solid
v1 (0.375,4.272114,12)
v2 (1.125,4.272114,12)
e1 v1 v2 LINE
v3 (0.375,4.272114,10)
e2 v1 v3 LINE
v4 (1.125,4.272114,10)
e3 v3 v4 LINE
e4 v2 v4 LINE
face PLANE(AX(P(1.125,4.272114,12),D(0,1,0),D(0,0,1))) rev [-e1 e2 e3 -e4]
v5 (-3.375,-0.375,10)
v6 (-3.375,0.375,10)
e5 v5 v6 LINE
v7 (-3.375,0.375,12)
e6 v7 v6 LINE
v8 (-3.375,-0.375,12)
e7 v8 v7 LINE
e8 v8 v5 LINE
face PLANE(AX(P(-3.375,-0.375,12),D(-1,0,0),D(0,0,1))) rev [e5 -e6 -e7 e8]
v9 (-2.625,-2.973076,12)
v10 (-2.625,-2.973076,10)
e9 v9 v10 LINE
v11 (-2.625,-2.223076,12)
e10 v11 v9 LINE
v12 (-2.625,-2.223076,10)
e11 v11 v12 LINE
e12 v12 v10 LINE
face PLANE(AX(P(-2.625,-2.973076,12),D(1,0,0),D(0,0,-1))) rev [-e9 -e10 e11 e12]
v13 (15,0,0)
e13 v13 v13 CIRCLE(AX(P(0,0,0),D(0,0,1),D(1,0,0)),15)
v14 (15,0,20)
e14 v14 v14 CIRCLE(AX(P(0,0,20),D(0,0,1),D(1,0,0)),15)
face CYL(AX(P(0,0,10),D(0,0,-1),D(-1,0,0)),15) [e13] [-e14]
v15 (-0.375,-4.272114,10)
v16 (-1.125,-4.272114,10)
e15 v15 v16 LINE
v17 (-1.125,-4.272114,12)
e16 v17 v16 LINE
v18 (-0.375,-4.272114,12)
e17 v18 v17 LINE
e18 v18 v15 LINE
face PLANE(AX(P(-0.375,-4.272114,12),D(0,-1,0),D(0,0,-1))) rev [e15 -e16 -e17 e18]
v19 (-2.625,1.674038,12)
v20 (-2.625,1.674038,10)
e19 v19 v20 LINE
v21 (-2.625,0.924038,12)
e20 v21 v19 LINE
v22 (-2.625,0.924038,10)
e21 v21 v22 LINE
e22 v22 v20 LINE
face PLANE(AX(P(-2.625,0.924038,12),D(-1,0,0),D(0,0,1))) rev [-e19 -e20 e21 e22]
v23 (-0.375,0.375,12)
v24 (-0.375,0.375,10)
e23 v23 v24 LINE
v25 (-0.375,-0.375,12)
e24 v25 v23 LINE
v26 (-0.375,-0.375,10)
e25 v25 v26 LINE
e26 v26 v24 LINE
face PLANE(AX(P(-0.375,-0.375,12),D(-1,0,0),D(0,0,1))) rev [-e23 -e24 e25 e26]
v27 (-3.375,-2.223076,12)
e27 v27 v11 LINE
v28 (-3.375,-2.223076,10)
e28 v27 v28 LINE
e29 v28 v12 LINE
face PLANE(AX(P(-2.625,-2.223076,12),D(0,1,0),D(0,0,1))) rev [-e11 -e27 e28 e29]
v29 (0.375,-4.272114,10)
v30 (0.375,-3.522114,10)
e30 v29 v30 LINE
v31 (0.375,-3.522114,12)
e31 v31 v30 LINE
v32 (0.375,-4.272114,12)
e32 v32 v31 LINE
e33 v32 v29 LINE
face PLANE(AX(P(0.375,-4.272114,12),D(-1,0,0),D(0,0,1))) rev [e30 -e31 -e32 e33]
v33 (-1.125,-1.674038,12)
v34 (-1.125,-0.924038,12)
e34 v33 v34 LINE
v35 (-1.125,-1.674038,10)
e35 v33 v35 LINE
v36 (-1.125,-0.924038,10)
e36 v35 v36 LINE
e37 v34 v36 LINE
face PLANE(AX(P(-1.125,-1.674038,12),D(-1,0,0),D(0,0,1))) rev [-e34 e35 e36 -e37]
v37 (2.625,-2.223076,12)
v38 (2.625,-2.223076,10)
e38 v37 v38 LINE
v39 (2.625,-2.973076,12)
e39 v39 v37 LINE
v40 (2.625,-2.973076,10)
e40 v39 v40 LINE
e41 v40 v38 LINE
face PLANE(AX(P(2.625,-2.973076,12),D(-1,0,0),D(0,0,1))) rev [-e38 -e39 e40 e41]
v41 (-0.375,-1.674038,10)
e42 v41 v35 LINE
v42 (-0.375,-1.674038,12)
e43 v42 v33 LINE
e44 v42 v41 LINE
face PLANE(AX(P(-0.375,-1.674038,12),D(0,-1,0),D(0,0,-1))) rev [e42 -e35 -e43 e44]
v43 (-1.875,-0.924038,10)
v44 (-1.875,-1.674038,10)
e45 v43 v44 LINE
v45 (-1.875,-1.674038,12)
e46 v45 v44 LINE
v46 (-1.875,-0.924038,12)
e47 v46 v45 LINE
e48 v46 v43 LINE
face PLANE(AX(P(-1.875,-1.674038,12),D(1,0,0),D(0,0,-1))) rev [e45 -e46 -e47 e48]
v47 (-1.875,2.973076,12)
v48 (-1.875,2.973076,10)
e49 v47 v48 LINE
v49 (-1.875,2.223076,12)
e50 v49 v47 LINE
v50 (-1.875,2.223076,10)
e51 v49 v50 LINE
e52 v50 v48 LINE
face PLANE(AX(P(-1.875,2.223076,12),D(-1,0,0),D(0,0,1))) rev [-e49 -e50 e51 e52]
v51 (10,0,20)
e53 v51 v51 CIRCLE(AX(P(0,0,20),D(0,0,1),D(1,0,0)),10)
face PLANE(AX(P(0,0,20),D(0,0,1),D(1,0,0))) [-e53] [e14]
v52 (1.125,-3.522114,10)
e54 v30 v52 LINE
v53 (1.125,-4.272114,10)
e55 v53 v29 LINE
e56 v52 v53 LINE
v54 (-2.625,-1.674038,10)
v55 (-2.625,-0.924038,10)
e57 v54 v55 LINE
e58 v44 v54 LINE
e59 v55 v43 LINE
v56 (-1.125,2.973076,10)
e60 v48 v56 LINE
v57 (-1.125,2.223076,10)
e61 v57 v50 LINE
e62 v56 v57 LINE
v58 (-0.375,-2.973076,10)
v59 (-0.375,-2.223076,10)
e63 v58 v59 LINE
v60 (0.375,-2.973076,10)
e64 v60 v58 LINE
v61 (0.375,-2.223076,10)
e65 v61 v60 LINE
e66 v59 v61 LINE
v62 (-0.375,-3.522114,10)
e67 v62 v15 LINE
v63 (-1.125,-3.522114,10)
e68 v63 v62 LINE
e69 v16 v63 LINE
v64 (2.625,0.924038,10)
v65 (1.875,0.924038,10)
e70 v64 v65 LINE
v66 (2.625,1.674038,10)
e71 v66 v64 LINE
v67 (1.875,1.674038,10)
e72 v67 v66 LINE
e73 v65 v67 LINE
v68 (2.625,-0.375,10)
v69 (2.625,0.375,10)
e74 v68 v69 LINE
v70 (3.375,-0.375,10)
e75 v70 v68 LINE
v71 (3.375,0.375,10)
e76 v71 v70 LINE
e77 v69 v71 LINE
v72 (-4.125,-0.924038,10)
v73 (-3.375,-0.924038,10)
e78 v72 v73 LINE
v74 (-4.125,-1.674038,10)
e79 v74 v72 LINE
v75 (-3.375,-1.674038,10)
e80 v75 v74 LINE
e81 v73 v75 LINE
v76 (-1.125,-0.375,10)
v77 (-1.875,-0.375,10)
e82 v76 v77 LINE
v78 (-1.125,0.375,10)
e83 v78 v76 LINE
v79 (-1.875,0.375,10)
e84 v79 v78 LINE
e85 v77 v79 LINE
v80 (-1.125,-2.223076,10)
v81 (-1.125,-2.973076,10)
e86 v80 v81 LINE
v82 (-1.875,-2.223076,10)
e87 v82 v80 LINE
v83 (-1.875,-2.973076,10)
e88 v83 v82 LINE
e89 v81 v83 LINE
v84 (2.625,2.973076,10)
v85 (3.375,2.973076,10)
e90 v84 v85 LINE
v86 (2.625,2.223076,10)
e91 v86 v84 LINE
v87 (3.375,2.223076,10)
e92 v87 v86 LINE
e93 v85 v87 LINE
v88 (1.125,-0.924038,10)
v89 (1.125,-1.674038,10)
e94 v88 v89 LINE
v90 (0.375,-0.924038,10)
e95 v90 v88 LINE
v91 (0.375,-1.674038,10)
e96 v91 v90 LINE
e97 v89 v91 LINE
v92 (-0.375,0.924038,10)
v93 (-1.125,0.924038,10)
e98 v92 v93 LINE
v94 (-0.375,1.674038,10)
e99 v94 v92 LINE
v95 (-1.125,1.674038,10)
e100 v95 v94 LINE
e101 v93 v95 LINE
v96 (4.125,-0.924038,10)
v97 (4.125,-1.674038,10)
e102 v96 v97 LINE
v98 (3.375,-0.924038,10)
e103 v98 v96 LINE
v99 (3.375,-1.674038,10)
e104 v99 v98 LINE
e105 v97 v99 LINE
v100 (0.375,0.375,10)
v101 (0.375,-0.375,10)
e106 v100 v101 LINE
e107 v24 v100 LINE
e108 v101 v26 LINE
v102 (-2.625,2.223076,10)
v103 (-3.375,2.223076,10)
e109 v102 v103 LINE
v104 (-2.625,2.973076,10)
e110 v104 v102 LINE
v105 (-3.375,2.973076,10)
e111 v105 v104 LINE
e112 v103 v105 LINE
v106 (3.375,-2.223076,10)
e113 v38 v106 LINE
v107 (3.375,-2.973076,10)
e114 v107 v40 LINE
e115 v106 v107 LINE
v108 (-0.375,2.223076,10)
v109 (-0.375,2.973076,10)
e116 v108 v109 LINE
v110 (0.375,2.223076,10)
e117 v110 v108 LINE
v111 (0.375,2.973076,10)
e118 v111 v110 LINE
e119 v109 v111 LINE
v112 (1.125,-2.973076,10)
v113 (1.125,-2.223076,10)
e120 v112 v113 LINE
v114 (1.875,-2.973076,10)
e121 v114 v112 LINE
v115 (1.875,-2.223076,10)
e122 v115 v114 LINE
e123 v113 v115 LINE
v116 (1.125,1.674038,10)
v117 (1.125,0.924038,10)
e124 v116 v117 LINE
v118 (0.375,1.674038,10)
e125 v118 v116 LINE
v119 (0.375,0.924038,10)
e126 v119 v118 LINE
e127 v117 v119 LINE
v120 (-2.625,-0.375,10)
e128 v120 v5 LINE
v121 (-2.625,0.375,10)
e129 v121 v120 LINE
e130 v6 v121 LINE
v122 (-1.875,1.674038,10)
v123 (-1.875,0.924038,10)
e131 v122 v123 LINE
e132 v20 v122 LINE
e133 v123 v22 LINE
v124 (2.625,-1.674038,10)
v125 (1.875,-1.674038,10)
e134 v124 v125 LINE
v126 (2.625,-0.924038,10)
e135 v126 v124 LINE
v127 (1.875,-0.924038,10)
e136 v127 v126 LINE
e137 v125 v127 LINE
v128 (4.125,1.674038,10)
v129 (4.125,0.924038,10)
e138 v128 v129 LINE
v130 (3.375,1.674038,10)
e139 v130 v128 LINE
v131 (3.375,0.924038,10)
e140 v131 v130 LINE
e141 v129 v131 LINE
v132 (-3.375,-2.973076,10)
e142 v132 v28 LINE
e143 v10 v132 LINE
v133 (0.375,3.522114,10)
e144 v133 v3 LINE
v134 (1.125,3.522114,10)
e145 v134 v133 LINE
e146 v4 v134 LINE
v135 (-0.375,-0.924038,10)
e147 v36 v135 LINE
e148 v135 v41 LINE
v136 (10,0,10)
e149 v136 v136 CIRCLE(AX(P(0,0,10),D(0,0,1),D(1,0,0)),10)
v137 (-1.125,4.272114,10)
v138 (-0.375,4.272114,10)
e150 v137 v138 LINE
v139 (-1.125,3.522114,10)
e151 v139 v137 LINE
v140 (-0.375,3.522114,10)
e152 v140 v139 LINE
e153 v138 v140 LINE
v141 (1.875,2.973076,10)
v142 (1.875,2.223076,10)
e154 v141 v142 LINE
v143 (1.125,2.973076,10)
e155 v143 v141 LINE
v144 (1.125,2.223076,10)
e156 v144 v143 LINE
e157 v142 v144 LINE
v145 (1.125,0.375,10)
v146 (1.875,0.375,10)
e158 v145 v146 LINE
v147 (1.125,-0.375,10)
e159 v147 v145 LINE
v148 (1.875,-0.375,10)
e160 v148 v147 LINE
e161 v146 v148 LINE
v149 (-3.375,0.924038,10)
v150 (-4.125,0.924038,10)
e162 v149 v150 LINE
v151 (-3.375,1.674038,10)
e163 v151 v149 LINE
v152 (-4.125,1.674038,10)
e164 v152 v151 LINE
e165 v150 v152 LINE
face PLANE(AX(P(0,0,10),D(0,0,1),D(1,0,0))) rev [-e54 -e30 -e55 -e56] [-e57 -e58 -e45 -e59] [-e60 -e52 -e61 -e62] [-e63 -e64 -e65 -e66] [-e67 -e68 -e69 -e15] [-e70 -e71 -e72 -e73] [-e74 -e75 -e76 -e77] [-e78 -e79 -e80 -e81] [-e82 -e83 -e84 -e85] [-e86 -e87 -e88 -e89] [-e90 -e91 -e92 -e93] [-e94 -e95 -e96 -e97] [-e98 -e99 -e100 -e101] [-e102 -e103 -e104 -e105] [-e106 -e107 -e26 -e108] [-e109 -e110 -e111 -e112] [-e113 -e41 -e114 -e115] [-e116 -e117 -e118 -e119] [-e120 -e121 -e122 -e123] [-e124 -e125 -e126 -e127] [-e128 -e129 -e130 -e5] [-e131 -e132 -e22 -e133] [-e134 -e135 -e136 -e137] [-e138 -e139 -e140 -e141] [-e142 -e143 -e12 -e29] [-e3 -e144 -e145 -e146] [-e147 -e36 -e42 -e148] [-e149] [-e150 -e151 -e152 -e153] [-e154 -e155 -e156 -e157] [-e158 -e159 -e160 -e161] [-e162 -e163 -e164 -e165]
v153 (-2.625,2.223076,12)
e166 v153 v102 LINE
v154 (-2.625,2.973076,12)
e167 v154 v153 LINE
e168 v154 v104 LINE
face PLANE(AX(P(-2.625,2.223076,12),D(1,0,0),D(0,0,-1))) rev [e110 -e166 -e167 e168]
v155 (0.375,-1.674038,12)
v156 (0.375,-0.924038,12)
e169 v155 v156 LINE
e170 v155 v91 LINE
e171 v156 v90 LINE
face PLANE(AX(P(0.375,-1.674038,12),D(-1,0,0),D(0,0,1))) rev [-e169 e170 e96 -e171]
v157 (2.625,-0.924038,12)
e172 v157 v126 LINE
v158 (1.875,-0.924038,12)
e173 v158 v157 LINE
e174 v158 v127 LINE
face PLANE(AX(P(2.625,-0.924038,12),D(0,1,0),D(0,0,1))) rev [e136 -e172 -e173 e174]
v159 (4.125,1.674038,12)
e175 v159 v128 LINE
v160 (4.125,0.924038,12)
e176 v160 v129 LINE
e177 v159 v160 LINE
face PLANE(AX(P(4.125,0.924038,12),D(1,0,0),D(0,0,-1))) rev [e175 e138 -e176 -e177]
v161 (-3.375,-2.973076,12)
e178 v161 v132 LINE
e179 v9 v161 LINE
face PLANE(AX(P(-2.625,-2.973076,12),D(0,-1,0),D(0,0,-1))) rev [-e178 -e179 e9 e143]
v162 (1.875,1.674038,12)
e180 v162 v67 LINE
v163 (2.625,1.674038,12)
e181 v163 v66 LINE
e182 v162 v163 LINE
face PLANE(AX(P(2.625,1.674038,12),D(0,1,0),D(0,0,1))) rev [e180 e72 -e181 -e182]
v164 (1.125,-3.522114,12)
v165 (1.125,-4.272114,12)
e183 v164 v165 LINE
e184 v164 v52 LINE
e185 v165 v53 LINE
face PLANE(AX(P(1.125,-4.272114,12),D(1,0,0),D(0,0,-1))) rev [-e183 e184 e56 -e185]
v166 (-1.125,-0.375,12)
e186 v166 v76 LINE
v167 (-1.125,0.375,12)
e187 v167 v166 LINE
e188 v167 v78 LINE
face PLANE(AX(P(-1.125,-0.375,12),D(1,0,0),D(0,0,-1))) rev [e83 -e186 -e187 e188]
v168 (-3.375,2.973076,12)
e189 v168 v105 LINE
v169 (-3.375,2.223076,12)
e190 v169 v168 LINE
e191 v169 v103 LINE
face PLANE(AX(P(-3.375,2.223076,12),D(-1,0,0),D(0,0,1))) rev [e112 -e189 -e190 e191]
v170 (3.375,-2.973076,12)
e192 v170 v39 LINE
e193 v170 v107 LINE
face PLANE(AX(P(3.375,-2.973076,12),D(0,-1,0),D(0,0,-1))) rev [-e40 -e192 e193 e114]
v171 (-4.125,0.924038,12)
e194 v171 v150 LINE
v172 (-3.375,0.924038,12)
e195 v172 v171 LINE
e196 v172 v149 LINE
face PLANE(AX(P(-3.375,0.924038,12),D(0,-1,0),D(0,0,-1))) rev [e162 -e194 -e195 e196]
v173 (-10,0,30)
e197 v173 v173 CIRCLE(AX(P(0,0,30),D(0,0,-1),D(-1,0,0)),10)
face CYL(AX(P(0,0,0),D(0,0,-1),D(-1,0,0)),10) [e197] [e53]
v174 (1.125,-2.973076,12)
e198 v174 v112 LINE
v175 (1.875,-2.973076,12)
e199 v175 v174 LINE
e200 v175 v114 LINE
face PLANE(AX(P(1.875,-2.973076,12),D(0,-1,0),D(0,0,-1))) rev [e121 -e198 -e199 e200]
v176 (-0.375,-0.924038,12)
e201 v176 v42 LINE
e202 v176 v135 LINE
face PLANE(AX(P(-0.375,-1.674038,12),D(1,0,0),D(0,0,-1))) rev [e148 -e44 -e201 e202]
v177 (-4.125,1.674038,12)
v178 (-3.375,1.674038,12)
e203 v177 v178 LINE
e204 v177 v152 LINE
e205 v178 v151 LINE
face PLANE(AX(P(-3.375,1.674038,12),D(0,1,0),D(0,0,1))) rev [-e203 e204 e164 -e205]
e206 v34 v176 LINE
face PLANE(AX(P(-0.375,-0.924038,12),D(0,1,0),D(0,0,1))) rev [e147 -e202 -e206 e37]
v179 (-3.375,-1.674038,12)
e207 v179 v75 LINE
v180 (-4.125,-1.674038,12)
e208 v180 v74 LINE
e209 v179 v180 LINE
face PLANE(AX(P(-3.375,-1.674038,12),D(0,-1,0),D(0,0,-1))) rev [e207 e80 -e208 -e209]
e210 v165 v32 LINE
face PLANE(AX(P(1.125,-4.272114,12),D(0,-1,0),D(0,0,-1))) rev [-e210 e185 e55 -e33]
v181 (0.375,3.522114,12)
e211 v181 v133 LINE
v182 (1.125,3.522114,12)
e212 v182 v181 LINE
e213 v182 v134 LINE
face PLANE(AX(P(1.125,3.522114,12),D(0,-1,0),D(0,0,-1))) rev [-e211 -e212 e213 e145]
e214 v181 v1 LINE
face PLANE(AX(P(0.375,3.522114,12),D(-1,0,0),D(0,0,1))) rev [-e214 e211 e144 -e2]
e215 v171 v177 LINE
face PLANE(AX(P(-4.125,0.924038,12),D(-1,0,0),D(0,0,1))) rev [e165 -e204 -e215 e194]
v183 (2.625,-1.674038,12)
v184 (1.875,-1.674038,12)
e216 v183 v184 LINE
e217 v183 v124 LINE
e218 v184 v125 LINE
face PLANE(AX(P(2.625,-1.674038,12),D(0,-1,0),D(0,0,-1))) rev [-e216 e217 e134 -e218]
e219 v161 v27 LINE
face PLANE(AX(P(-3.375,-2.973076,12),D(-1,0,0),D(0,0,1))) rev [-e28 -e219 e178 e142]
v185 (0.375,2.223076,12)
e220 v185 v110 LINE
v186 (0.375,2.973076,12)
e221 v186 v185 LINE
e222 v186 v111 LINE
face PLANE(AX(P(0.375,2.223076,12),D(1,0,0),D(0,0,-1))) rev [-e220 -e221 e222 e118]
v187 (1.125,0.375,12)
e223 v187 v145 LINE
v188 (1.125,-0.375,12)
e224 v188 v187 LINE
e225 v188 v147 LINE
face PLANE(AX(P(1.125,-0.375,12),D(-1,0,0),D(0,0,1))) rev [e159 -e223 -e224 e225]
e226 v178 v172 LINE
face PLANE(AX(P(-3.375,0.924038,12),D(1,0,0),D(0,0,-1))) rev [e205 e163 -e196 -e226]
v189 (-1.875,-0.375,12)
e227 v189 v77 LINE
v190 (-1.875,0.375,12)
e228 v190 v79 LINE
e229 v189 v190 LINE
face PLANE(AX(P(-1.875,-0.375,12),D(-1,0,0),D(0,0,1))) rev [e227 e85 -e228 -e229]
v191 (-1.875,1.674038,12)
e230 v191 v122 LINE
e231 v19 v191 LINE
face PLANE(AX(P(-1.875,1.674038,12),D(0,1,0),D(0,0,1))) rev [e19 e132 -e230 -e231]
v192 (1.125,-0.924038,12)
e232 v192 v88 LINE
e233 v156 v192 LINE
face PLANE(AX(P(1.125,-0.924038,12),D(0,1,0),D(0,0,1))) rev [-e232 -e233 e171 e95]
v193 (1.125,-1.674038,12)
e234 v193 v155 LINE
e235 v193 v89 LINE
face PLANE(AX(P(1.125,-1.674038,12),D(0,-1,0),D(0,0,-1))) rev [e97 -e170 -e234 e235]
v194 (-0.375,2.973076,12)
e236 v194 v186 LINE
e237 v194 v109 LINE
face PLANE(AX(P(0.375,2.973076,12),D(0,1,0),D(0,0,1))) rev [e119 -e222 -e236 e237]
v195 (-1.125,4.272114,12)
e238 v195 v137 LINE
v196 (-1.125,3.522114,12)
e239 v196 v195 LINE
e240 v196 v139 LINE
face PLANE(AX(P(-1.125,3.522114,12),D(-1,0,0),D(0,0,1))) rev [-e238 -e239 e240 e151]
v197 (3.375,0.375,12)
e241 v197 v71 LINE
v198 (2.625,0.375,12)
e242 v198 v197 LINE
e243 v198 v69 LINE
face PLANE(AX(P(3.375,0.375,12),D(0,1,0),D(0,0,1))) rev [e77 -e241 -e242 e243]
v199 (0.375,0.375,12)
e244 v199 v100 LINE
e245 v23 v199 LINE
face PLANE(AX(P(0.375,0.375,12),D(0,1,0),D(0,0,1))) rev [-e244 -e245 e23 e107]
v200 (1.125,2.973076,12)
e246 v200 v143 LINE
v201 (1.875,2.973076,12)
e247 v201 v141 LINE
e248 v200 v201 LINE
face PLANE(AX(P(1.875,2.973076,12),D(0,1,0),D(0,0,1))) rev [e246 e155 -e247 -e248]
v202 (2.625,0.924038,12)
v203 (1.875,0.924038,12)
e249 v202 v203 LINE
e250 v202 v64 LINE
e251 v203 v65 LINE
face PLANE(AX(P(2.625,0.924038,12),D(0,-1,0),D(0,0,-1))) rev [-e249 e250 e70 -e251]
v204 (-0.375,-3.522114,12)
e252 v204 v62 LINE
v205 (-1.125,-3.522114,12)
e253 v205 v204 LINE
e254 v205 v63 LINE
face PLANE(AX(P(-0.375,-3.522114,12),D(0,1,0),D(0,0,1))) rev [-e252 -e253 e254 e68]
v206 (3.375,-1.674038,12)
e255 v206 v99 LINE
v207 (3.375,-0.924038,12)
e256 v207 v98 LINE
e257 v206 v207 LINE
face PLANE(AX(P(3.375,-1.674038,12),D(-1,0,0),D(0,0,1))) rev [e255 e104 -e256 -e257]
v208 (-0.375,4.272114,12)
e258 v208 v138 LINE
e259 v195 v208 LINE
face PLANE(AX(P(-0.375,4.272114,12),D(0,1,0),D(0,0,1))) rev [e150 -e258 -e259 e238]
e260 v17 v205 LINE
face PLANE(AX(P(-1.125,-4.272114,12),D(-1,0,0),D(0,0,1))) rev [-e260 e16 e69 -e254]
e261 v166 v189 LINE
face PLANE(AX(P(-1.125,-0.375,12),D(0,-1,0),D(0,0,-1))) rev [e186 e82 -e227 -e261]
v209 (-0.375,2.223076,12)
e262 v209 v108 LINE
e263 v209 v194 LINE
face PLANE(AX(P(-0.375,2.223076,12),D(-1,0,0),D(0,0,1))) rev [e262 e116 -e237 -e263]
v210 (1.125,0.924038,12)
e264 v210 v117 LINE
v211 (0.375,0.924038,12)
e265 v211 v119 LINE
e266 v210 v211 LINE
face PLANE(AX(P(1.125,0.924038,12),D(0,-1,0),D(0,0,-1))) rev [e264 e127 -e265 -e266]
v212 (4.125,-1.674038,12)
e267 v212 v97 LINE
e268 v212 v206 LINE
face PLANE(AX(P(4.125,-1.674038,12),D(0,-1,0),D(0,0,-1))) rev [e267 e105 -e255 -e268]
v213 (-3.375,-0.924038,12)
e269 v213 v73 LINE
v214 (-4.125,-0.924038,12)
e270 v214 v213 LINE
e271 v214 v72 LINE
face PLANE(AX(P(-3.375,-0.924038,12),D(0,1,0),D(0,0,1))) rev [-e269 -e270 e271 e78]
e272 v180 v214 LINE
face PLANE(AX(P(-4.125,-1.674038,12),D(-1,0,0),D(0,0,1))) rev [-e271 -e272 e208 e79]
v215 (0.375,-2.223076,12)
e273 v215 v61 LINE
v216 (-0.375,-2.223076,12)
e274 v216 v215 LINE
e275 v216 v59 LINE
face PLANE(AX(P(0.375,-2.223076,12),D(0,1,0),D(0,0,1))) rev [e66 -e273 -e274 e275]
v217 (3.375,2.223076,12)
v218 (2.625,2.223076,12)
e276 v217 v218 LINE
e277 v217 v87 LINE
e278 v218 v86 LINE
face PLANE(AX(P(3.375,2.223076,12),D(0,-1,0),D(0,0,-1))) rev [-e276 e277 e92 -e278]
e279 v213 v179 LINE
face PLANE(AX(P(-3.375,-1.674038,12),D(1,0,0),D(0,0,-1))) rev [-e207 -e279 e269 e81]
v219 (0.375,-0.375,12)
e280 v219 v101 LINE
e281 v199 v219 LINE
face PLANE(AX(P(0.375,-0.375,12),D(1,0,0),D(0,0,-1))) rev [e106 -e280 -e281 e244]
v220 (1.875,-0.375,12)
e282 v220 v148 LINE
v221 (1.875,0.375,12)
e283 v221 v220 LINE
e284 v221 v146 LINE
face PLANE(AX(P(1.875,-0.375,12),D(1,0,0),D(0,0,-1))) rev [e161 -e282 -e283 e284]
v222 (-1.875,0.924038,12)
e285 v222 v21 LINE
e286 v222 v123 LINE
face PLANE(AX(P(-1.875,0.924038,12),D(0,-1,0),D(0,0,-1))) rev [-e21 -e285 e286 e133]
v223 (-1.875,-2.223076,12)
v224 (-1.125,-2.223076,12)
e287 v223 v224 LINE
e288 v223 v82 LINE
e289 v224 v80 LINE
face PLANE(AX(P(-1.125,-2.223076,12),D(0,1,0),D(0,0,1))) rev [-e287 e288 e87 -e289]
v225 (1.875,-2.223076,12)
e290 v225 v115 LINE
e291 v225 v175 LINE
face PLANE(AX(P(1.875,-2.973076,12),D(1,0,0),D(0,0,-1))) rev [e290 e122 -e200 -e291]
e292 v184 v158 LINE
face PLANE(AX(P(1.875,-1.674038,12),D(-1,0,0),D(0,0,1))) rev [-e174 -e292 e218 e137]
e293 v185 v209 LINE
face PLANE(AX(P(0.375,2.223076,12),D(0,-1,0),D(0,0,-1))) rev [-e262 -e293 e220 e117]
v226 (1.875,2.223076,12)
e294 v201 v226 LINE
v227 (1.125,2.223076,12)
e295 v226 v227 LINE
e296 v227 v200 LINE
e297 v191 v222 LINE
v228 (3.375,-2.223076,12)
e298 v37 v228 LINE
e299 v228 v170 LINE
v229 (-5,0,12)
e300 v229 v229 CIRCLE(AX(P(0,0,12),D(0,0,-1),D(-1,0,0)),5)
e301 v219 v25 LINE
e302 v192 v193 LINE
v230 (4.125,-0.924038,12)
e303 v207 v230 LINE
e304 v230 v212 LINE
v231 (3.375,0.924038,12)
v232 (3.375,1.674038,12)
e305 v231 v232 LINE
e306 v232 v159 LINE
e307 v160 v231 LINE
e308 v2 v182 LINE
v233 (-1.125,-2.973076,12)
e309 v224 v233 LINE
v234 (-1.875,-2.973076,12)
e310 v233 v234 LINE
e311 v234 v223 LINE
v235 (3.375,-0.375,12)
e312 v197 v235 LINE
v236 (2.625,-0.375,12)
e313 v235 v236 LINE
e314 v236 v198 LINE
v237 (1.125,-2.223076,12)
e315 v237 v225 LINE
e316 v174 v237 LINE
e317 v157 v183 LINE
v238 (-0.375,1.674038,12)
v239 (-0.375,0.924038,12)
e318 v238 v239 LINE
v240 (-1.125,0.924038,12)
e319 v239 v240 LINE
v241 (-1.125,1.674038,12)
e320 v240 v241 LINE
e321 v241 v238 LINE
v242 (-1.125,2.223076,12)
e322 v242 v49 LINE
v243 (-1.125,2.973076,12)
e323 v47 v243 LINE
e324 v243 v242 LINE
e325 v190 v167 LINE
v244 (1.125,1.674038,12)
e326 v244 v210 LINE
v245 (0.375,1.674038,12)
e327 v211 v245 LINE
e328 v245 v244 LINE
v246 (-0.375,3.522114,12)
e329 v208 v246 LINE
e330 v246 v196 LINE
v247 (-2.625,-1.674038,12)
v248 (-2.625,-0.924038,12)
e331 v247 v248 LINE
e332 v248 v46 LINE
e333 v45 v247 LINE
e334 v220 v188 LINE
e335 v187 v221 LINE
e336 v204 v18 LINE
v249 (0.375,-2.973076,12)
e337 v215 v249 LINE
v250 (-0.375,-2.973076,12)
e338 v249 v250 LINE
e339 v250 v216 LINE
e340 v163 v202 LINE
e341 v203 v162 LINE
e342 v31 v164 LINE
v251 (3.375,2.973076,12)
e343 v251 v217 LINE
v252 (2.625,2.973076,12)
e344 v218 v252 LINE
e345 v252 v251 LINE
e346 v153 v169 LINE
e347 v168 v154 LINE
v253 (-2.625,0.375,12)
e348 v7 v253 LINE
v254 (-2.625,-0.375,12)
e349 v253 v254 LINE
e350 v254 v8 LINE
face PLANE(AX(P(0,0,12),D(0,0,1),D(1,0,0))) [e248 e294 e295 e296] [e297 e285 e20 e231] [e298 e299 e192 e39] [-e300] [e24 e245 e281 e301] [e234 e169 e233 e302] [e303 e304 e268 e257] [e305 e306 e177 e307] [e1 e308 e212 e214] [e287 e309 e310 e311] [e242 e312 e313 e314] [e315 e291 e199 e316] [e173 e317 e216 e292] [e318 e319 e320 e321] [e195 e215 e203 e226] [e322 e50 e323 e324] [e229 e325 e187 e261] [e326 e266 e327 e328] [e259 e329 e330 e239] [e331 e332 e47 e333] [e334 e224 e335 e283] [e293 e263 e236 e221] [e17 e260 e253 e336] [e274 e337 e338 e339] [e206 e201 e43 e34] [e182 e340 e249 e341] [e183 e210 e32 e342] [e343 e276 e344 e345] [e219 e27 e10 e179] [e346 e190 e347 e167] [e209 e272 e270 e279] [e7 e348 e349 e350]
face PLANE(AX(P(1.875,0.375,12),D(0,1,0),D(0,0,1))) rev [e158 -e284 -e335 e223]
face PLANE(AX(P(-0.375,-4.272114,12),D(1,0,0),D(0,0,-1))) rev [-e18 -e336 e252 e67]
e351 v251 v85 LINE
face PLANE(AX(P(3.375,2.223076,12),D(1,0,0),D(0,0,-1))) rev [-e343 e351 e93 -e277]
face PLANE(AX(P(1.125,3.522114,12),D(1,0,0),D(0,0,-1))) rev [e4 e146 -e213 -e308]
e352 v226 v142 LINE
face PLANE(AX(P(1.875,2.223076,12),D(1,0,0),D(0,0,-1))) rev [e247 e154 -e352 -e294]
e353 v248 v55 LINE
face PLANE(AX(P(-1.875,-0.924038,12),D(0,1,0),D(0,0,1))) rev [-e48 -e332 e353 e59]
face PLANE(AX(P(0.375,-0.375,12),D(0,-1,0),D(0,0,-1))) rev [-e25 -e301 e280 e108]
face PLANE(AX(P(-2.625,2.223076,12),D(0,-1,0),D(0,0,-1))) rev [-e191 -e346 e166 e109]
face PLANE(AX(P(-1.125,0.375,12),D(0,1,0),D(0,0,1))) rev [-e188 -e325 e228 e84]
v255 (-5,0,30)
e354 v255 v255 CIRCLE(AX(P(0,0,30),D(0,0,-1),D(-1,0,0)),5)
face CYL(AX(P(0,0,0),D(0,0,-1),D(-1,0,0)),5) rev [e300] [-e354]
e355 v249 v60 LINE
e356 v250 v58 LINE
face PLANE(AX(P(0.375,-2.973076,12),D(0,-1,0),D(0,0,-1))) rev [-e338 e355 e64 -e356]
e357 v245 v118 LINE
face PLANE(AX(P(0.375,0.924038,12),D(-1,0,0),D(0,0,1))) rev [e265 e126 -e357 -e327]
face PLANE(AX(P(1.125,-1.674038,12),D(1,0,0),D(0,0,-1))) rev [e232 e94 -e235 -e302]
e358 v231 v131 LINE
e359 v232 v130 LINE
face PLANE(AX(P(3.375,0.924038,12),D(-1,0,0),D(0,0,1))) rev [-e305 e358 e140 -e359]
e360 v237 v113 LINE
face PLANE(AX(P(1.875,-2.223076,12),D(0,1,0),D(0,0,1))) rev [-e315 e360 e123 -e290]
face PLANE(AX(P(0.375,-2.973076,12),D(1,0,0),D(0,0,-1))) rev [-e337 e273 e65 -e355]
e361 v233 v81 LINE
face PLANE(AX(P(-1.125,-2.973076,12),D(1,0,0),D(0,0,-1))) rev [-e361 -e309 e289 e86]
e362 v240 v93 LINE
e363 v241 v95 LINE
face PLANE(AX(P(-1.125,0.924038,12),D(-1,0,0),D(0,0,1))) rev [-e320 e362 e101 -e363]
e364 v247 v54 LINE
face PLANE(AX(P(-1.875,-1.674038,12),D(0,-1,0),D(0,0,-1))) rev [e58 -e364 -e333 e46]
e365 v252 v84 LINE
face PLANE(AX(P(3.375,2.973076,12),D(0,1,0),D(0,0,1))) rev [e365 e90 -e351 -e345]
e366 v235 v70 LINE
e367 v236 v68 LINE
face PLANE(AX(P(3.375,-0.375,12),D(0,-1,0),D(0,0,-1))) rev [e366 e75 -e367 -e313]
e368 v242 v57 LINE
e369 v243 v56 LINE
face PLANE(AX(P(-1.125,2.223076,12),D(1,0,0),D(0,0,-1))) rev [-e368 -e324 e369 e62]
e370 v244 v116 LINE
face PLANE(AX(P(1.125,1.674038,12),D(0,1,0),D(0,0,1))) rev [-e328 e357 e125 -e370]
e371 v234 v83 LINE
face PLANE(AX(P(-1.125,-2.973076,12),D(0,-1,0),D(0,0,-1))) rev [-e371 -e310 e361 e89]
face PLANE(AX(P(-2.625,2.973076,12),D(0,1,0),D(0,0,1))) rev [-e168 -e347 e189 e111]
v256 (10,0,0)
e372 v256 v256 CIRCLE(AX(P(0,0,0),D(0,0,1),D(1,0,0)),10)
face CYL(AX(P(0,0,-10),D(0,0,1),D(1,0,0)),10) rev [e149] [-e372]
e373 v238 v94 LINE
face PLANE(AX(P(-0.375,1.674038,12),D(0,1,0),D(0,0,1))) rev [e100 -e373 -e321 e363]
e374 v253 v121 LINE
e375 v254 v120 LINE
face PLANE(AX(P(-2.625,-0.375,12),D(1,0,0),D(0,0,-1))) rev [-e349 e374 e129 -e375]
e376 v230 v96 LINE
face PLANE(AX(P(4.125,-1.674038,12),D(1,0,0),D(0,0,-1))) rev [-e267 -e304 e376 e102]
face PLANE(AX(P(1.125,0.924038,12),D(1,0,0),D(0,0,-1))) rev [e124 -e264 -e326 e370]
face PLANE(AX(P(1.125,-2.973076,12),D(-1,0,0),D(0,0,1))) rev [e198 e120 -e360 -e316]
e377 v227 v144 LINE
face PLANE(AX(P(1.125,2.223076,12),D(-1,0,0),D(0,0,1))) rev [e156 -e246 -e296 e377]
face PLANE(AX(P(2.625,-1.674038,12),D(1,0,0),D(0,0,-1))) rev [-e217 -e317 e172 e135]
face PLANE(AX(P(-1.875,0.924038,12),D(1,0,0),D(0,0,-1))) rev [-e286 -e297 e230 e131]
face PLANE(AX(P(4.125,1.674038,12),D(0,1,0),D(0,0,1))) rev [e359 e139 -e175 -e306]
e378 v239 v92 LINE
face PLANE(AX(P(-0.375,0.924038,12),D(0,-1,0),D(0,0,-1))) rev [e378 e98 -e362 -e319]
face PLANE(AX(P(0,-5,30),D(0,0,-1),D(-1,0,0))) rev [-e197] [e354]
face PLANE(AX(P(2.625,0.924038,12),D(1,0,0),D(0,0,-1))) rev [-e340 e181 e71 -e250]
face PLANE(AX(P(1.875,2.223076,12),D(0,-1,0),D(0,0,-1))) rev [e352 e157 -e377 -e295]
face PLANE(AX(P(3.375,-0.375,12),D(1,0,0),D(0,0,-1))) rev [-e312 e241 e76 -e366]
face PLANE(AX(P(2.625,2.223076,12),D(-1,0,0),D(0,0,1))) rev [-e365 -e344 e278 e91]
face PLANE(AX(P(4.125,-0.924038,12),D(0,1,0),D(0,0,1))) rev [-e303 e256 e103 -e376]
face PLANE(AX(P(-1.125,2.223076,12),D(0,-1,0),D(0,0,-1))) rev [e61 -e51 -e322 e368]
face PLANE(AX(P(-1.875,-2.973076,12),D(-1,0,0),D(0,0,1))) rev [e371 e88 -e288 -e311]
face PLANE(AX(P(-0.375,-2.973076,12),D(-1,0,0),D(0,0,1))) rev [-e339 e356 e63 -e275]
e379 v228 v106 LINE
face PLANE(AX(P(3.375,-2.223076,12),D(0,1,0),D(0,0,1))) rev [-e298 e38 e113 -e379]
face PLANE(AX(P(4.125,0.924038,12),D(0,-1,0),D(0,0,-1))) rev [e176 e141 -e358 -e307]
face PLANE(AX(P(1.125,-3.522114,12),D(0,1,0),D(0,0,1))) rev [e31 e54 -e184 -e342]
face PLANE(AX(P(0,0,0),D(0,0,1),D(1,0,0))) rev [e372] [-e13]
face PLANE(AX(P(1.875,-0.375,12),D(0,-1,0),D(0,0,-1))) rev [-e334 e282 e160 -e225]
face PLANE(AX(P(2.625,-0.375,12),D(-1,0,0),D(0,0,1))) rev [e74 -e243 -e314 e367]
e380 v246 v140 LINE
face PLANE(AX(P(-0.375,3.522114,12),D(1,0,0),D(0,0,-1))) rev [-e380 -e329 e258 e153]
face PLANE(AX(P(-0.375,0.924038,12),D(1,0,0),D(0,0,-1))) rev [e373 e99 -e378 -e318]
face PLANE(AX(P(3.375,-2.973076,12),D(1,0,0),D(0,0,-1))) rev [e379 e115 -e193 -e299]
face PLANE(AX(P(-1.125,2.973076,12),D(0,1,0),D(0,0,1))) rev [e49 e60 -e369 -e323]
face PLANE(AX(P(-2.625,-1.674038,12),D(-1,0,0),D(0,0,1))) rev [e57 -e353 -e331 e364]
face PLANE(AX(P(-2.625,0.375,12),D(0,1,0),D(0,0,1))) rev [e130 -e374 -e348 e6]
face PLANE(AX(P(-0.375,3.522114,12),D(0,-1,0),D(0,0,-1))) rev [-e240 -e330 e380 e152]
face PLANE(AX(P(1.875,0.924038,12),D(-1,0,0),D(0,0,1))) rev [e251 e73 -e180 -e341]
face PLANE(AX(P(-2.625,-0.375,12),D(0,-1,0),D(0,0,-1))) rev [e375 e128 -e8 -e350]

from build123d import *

# Parameters (mm, degrees)
SKETCH1_R                  = 15
BOSS_EXTRUDE1_DEPTH        = 10
SKETCH2_R                  = 10
CUT_EXTRUDE1_DEPTH         = 20
SKETCH3_R                  = 15
BOSS_EXTRUDE2_DEPTH        = 10
SKETCH5_R                  = 10
CUT_EXTRUDE3_DEPTH         = 8
SKETCH8_W                  = 0.75
SKETCH8_H                  = 0.75
CUT_EXTRUDE5_DEPTH         = 2
FILL_START                 = -1.125
FILL_PATTERN2_OUTLINE_W    = 0.75
FILL_PATTERN2_OUTLINE_H    = 2
FILL_PATTERN2_DEPTH        = 0.75
FILL_START_2               = 0.375
FILL_PATTERN2_2_OUTLINE_W  = 0.75
FILL_PATTERN2_2_OUTLINE_H  = 2
FILL_PATTERN2_2_DEPTH      = 0.75
FILL_START_3               = -3.375
FILL_PATTERN2_3_OUTLINE_W  = 0.75
FILL_PATTERN2_3_OUTLINE_H  = 2
FILL_PATTERN2_3_DEPTH      = 0.75
FILL_START_4               = -1.875
FILL_PATTERN2_4_OUTLINE_W  = 0.75
FILL_PATTERN2_4_OUTLINE_H  = 2
FILL_PATTERN2_4_DEPTH      = 0.75
FILL_START_5               = 1.125
FILL_PATTERN2_5_OUTLINE_W  = 0.75
FILL_PATTERN2_5_OUTLINE_H  = 2
FILL_PATTERN2_5_DEPTH      = 0.75
FILL_START_6               = 2.625
FILL_PATTERN2_6_OUTLINE_W  = 0.75
FILL_PATTERN2_6_OUTLINE_H  = 2
FILL_PATTERN2_6_DEPTH      = 0.75
FILL_START_7               = -4.125
FILL_PATTERN2_7_OUTLINE_W  = 0.75
FILL_PATTERN2_7_OUTLINE_H  = 2
FILL_PATTERN2_7_DEPTH      = 0.75
FILL_START_8               = -2.625
FILL_PATTERN2_8_OUTLINE_W  = 0.75
FILL_PATTERN2_8_OUTLINE_H  = 2
FILL_PATTERN2_8_DEPTH      = 0.75
FILL_START_9               = -0.375
FILL_PATTERN2_9_OUTLINE_W  = 0.75
FILL_PATTERN2_9_OUTLINE_H  = 2
FILL_PATTERN2_9_DEPTH      = 0.75
FILL_START_10              = 1.875
FILL_PATTERN2_10_OUTLINE_W = 0.75
FILL_PATTERN2_10_OUTLINE_H = 2
FILL_PATTERN2_10_DEPTH     = 0.75
FILL_START_11              = 3.375
FILL_PATTERN2_11_OUTLINE_W = 0.75
FILL_PATTERN2_11_OUTLINE_H = 2
FILL_PATTERN2_11_DEPTH     = 0.75
SKETCH12_W                 = 18
SKETCH12_H                 = 5


# Read off the part's stored shape, not the designer's step: Fill Pattern2
with BuildPart() as part:
    # Sketch1 → Boss-Extrude1 (new body)
    with BuildSketch(Plane.XY):
        Circle(SKETCH1_R)
    extrude(amount=BOSS_EXTRUDE1_DEPTH)

    # Sketch2 → Cut-Extrude1 (cut)
    with BuildSketch(Plane.XY.offset(10)):
        Circle(SKETCH2_R)
    extrude(amount=-CUT_EXTRUDE1_DEPTH, mode=Mode.SUBTRACT)

    # Sketch3 → Boss-Extrude2 (add)
    with BuildSketch(Plane.XY.offset(10)):
        Circle(SKETCH3_R)
    extrude(amount=BOSS_EXTRUDE2_DEPTH)

    # Sketch5 → Cut-Extrude3 (cut)
    with BuildSketch(Plane.XY.offset(20)):
        Circle(SKETCH5_R)
    extrude(amount=-CUT_EXTRUDE3_DEPTH, mode=Mode.SUBTRACT)

    # Sketch8 → Cut-Extrude5 (cut)
    with BuildSketch(Plane(origin=(0, 0, 10), x_dir=(-1, 0, 0), z_dir=(0, 0, -1))):
        Rectangle(SKETCH8_W, SKETCH8_H)
    extrude(amount=-CUT_EXTRUDE5_DEPTH, mode=Mode.SUBTRACT)

    # Fill Pattern2 outline → Fill Pattern2 (cut)
    with BuildSketch(Plane.YZ.offset(FILL_START)):
        with Locations((-1.299038106, 11)):
            Rectangle(FILL_PATTERN2_OUTLINE_W, FILL_PATTERN2_OUTLINE_H)
        with Locations((1.299038106, 11)):
            Rectangle(FILL_PATTERN2_OUTLINE_W, FILL_PATTERN2_OUTLINE_H)
        with Locations((-3.897114317, 11)):
            Rectangle(FILL_PATTERN2_OUTLINE_W, FILL_PATTERN2_OUTLINE_H)
        with Locations((3.897114317, 11)):
            Rectangle(FILL_PATTERN2_OUTLINE_W, FILL_PATTERN2_OUTLINE_H)
    extrude(amount=FILL_PATTERN2_DEPTH, mode=Mode.SUBTRACT)

    # Fill Pattern2 2 outline → Fill Pattern2 2 (cut)
    with BuildSketch(Plane.YZ.offset(FILL_START_2)):
        with Locations((-1.299038106, 11)):
            Rectangle(FILL_PATTERN2_2_OUTLINE_W, FILL_PATTERN2_2_OUTLINE_H)
        with Locations((1.299038106, 11)):
            Rectangle(FILL_PATTERN2_2_OUTLINE_W, FILL_PATTERN2_2_OUTLINE_H)
        with Locations((-3.897114317, 11)):
            Rectangle(FILL_PATTERN2_2_OUTLINE_W, FILL_PATTERN2_2_OUTLINE_H)
        with Locations((3.897114317, 11)):
            Rectangle(FILL_PATTERN2_2_OUTLINE_W, FILL_PATTERN2_2_OUTLINE_H)
    extrude(amount=FILL_PATTERN2_2_DEPTH, mode=Mode.SUBTRACT)

    # Fill Pattern2 3 outline → Fill Pattern2 3 (cut)
    with BuildSketch(Plane.YZ.offset(FILL_START_3)):
        with Locations((0, 11)):
            Rectangle(FILL_PATTERN2_3_OUTLINE_W, FILL_PATTERN2_3_OUTLINE_H)
        with Locations((-2.598076211, 11)):
            Rectangle(FILL_PATTERN2_3_OUTLINE_W, FILL_PATTERN2_3_OUTLINE_H)
        with Locations((2.598076211, 11)):
            Rectangle(FILL_PATTERN2_3_OUTLINE_W, FILL_PATTERN2_3_OUTLINE_H)
    extrude(amount=FILL_PATTERN2_3_DEPTH, mode=Mode.SUBTRACT)

    # Fill Pattern2 4 outline → Fill Pattern2 4 (cut)
    with BuildSketch(Plane.YZ.offset(FILL_START_4)):
        with Locations((0, 11)):
            Rectangle(FILL_PATTERN2_4_OUTLINE_W, FILL_PATTERN2_4_OUTLINE_H)
        with Locations((-2.598076211, 11)):
            Rectangle(FILL_PATTERN2_4_OUTLINE_W, FILL_PATTERN2_4_OUTLINE_H)
        with Locations((2.598076211, 11)):
            Rectangle(FILL_PATTERN2_4_OUTLINE_W, FILL_PATTERN2_4_OUTLINE_H)
    extrude(amount=FILL_PATTERN2_4_DEPTH, mode=Mode.SUBTRACT)

    # Fill Pattern2 5 outline → Fill Pattern2 5 (cut)
    with BuildSketch(Plane.YZ.offset(FILL_START_5)):
        with Locations((0, 11)):
            Rectangle(FILL_PATTERN2_5_OUTLINE_W, FILL_PATTERN2_5_OUTLINE_H)
        with Locations((-2.598076211, 11)):
            Rectangle(FILL_PATTERN2_5_OUTLINE_W, FILL_PATTERN2_5_OUTLINE_H)
        with Locations((2.598076211, 11)):
            Rectangle(FILL_PATTERN2_5_OUTLINE_W, FILL_PATTERN2_5_OUTLINE_H)
    extrude(amount=FILL_PATTERN2_5_DEPTH, mode=Mode.SUBTRACT)

    # Fill Pattern2 6 outline → Fill Pattern2 6 (cut)
    with BuildSketch(Plane.YZ.offset(FILL_START_6)):
        with Locations((0, 11)):
            Rectangle(FILL_PATTERN2_6_OUTLINE_W, FILL_PATTERN2_6_OUTLINE_H)
        with Locations((-2.598076211, 11)):
            Rectangle(FILL_PATTERN2_6_OUTLINE_W, FILL_PATTERN2_6_OUTLINE_H)
        with Locations((2.598076211, 11)):
            Rectangle(FILL_PATTERN2_6_OUTLINE_W, FILL_PATTERN2_6_OUTLINE_H)
    extrude(amount=FILL_PATTERN2_6_DEPTH, mode=Mode.SUBTRACT)

    # Fill Pattern2 7 outline → Fill Pattern2 7 (cut)
    with BuildSketch(Plane.YZ.offset(FILL_START_7)):
        with Locations((-1.299038106, 11)):
            Rectangle(FILL_PATTERN2_7_OUTLINE_W, FILL_PATTERN2_7_OUTLINE_H)
        with Locations((1.299038106, 11)):
            Rectangle(FILL_PATTERN2_7_OUTLINE_W, FILL_PATTERN2_7_OUTLINE_H)
    extrude(amount=FILL_PATTERN2_7_DEPTH, mode=Mode.SUBTRACT)

    # Fill Pattern2 8 outline → Fill Pattern2 8 (cut)
    with BuildSketch(Plane.YZ.offset(FILL_START_8)):
        with Locations((-1.299038106, 11)):
            Rectangle(FILL_PATTERN2_8_OUTLINE_W, FILL_PATTERN2_8_OUTLINE_H)
        with Locations((1.299038106, 11)):
            Rectangle(FILL_PATTERN2_8_OUTLINE_W, FILL_PATTERN2_8_OUTLINE_H)
    extrude(amount=FILL_PATTERN2_8_DEPTH, mode=Mode.SUBTRACT)

    # Fill Pattern2 9 outline → Fill Pattern2 9 (cut)
    with BuildSketch(Plane.YZ.offset(FILL_START_9)):
        with Locations((-2.598076211, 11)):
            Rectangle(FILL_PATTERN2_9_OUTLINE_W, FILL_PATTERN2_9_OUTLINE_H)
        with Locations((2.598076211, 11)):
            Rectangle(FILL_PATTERN2_9_OUTLINE_W, FILL_PATTERN2_9_OUTLINE_H)
    extrude(amount=FILL_PATTERN2_9_DEPTH, mode=Mode.SUBTRACT)

    # Fill Pattern2 10 outline → Fill Pattern2 10 (cut)
    with BuildSketch(Plane.YZ.offset(FILL_START_10)):
        with Locations((-1.299038106, 11)):
            Rectangle(FILL_PATTERN2_10_OUTLINE_W, FILL_PATTERN2_10_OUTLINE_H)
        with Locations((1.299038106, 11)):
            Rectangle(FILL_PATTERN2_10_OUTLINE_W, FILL_PATTERN2_10_OUTLINE_H)
    extrude(amount=FILL_PATTERN2_10_DEPTH, mode=Mode.SUBTRACT)

    # Fill Pattern2 11 outline → Fill Pattern2 11 (cut)
    with BuildSketch(Plane.YZ.offset(FILL_START_11)):
        with Locations((-1.299038106, 11)):
            Rectangle(FILL_PATTERN2_11_OUTLINE_W, FILL_PATTERN2_11_OUTLINE_H)
        with Locations((1.299038106, 11)):
            Rectangle(FILL_PATTERN2_11_OUTLINE_W, FILL_PATTERN2_11_OUTLINE_H)
    extrude(amount=FILL_PATTERN2_11_DEPTH, mode=Mode.SUBTRACT)

    # Sketch12 → Revolve2 (revolve)
    with BuildSketch(Plane(origin=(0, 0, 0), x_dir=(0, 0, -1), z_dir=(1, 0, 0)), mode=Mode.PRIVATE) as revolve2_sk:
        with Locations((-21, -7.5)):
            Rectangle(SKETCH12_W, SKETCH12_H)
    revolve(revolve2_sk.sketch.rotate(Axis((0, 0, 0), (0, 0, 1)), 270), axis=Axis((0, 0, 0), (0, 0, 1)))


solid = part.part
